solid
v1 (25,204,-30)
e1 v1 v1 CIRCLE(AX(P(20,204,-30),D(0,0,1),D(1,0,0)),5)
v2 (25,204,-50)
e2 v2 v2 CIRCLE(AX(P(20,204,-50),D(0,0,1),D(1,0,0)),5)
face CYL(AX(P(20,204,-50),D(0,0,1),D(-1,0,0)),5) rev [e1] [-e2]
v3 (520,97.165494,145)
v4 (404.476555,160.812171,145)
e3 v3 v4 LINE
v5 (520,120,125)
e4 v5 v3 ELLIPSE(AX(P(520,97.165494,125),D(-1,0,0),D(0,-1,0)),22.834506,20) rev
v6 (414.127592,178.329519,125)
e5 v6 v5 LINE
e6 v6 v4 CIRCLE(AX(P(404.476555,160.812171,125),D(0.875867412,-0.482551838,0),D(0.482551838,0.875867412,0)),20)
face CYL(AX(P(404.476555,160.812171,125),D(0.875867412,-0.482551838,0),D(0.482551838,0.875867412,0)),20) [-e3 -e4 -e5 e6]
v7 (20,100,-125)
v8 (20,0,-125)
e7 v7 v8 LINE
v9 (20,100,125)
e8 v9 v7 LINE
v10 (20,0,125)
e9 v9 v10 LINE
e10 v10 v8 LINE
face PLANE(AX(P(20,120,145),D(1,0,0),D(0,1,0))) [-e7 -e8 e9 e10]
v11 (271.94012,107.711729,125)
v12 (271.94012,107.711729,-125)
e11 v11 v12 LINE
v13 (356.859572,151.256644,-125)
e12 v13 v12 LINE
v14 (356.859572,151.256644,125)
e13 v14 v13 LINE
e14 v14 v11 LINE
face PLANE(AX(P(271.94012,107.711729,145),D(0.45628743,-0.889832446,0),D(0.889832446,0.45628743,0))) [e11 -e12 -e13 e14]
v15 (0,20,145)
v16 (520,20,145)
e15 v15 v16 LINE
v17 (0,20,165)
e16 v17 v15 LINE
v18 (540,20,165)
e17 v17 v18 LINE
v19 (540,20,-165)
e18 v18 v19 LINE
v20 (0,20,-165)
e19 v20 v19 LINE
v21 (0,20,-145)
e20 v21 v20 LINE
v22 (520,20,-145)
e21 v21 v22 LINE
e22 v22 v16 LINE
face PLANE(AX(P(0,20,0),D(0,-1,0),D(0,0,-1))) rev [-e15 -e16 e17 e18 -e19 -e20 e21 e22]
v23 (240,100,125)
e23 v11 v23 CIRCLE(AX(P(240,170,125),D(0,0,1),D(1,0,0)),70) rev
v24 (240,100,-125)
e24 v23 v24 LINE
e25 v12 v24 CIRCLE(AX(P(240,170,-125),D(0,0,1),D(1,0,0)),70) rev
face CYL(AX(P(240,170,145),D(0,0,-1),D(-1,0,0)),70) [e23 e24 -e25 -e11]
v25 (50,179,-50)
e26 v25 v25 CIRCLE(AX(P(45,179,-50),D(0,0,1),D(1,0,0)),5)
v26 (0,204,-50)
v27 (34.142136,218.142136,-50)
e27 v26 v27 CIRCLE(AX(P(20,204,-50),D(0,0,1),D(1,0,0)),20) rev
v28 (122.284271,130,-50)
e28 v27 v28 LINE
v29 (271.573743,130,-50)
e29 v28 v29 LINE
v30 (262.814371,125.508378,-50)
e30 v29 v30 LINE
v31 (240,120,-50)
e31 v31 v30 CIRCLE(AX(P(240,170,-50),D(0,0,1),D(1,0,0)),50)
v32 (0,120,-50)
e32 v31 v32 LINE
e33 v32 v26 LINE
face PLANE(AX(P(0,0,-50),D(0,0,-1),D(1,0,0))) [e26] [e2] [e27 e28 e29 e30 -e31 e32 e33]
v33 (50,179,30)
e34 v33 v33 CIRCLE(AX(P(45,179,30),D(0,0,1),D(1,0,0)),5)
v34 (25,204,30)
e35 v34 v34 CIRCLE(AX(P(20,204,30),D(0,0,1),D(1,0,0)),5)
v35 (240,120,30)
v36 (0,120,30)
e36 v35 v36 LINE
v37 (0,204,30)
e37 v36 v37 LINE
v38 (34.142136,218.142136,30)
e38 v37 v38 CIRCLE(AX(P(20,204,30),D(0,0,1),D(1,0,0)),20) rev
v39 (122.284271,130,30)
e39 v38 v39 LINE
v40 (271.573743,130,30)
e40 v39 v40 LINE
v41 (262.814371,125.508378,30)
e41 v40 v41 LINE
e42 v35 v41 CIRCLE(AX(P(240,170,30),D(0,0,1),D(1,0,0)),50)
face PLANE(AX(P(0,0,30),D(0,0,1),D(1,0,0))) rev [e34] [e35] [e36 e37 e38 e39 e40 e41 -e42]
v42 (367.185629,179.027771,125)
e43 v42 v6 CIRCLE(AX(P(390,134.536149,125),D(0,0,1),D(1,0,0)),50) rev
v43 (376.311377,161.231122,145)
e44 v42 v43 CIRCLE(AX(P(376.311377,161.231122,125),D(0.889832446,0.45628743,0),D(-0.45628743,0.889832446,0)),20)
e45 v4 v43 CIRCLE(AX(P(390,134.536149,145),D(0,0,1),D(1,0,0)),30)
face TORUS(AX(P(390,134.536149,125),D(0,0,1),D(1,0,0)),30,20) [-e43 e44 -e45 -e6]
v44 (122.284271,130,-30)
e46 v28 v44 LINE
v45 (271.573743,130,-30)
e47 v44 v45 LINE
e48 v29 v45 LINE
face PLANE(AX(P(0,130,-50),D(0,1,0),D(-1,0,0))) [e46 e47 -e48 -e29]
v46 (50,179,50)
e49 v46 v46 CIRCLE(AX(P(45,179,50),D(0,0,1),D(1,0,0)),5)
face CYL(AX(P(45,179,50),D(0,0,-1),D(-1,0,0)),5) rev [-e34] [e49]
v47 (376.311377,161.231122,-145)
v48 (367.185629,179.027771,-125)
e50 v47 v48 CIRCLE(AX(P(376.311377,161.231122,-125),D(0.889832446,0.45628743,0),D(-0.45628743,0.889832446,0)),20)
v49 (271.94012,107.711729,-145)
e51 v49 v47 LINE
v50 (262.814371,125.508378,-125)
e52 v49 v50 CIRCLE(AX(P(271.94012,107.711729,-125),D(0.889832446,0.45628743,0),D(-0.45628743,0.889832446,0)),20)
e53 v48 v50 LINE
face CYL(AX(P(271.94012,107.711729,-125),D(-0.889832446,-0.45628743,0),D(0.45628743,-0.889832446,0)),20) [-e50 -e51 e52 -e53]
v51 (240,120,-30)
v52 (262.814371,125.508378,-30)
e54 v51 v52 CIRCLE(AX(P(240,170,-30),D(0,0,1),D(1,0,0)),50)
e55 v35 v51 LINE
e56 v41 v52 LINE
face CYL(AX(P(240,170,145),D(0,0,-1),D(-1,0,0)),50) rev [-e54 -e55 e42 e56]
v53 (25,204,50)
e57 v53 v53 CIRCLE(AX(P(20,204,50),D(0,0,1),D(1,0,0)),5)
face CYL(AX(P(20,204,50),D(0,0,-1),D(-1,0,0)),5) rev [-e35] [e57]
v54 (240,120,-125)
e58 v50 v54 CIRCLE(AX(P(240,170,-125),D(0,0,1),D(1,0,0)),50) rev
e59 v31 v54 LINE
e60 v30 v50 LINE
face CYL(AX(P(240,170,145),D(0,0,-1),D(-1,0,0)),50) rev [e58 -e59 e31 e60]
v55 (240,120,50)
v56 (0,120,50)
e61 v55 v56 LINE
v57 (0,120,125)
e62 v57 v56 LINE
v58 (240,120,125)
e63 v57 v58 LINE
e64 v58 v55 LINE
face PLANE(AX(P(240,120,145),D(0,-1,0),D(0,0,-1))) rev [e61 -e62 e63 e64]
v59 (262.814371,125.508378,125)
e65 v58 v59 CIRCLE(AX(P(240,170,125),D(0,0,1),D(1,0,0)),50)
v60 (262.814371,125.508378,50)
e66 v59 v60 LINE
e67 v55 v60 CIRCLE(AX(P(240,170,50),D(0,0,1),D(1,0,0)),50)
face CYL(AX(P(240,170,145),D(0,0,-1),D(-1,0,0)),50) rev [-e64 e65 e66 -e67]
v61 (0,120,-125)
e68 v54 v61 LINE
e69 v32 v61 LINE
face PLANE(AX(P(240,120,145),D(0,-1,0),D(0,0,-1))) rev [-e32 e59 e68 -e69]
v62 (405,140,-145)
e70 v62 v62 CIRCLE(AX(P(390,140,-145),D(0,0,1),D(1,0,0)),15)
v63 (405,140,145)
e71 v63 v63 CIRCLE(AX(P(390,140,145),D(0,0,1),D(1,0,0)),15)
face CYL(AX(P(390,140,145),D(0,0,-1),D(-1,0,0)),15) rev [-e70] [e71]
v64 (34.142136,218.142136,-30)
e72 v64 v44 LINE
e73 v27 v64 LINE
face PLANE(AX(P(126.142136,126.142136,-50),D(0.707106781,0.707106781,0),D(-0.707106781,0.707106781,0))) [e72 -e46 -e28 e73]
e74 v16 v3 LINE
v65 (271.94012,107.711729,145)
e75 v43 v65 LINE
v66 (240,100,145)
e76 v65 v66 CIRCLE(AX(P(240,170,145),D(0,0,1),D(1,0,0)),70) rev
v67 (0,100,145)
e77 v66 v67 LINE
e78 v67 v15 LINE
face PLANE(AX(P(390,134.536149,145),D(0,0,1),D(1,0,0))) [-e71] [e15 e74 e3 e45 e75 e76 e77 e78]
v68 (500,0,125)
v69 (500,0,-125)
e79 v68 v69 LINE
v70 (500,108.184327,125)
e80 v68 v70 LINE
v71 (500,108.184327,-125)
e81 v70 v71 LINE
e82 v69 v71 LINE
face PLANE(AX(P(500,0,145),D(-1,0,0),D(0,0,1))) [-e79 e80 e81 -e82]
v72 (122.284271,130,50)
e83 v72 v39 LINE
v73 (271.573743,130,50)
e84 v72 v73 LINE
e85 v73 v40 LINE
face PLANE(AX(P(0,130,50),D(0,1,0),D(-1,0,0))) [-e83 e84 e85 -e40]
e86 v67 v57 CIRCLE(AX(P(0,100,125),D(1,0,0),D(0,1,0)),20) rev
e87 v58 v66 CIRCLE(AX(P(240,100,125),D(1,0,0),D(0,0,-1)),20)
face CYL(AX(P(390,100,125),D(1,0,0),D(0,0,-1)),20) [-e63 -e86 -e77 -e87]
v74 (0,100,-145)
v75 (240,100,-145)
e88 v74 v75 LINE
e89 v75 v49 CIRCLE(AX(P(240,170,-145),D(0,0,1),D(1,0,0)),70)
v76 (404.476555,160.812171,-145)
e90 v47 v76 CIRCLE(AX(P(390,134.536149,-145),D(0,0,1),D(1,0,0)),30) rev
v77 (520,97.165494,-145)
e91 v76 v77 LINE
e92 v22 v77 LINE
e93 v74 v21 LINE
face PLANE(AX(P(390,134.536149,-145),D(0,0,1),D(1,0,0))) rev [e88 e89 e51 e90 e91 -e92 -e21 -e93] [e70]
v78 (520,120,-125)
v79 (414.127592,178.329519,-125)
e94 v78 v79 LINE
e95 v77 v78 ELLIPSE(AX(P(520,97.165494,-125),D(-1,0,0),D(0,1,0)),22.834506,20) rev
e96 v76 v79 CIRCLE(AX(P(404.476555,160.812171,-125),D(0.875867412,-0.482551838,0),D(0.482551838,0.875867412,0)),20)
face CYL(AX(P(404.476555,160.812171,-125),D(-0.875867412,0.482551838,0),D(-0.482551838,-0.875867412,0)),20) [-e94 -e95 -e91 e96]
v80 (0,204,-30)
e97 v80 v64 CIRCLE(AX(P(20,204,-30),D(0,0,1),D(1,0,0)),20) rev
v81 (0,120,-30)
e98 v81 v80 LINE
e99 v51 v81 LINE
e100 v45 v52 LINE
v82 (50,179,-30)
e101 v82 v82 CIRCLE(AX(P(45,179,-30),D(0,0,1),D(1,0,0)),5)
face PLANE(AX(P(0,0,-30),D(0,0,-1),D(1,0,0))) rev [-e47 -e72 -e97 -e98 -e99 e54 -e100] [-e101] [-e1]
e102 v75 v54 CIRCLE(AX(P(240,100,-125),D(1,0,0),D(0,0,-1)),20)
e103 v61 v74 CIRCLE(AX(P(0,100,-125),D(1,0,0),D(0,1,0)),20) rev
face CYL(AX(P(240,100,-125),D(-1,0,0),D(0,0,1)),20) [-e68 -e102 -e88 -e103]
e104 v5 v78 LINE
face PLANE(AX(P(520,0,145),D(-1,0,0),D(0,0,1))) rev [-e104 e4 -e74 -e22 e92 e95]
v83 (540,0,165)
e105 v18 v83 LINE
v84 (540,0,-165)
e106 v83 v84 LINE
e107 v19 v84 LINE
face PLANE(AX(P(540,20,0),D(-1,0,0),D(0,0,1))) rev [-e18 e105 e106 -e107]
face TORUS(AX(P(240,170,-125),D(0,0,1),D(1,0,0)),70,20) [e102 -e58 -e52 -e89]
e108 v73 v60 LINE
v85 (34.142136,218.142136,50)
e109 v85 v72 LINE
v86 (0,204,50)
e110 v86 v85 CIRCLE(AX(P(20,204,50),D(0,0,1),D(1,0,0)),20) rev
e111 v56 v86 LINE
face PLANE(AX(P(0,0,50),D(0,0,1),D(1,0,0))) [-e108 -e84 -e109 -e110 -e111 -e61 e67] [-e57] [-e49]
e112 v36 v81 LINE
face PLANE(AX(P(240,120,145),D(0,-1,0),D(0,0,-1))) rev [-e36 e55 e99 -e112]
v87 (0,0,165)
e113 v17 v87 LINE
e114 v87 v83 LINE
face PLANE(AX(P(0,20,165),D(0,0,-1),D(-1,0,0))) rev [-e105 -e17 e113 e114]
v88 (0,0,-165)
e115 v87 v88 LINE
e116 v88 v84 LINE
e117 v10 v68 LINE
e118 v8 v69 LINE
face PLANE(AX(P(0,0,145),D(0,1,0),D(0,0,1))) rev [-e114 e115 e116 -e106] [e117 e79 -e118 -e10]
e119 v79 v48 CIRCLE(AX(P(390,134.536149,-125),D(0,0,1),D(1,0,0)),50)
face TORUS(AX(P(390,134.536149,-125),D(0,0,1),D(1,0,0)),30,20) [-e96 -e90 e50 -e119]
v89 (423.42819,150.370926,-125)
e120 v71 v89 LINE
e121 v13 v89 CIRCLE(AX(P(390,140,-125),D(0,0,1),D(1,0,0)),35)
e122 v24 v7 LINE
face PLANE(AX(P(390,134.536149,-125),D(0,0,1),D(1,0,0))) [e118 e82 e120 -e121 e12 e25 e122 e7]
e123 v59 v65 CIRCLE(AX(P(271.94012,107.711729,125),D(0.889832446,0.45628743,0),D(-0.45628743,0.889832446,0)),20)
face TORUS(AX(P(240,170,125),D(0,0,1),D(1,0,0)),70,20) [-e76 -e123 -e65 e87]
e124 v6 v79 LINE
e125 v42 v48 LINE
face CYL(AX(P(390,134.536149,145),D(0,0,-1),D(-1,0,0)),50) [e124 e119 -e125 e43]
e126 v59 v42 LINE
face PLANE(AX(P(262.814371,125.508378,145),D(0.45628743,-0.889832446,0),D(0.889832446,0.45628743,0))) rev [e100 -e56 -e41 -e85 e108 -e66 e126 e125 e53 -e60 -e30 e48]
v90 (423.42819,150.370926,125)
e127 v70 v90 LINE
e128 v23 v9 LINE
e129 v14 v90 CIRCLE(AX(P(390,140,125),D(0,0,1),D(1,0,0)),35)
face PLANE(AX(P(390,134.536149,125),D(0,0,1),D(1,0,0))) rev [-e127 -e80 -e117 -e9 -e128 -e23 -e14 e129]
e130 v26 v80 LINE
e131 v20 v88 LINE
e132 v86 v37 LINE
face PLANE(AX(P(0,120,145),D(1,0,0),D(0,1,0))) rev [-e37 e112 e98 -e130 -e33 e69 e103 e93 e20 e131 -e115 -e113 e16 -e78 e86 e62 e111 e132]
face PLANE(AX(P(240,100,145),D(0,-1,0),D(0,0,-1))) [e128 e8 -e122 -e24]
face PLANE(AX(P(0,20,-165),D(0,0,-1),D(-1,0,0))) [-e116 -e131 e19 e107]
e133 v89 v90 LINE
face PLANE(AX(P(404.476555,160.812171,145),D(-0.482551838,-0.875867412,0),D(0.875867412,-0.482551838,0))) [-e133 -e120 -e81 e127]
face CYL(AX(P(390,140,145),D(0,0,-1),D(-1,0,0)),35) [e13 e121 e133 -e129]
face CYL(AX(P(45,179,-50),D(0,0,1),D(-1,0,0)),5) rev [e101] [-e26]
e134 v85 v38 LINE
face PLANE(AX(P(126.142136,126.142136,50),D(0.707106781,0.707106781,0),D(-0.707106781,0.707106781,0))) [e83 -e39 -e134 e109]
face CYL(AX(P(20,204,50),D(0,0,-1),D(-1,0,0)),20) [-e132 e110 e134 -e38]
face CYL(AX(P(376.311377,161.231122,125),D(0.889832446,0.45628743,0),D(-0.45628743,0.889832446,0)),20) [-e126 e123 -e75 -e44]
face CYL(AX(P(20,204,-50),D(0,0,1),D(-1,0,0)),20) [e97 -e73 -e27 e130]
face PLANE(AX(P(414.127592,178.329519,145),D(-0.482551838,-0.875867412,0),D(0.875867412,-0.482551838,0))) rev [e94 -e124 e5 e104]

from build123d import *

# Parameters (mm, degrees)
SKETCH1_R           = 15
BOSS_EXTRUDE2_DEPTH = 145
BOSS_EXTRUDE3_START = 50
SKETCH5_R           = 5
BOSS_EXTRUDE3_DEPTH = 20
SHELL1_START        = -125
SHELL1_DEPTH        = 250
SKETCH6_W           = 520
SKETCH6_H           = 290
BOSS_EXTRUDE4_DEPTH = 20
FILLET1_R           = 20


# Read off the part's stored shape, not the designer's step: Shell1
with BuildPart() as part:
    # Sketch1 → Boss-Extrude2 (new, symmetric)
    with BuildSketch(Plane.XY):
        with BuildLine():
            Line((0, 120), (0, 0))
            Line((0, 0), (520, 0))
            Line((520, 0), (520, 120))
            Line((520, 120), (414.127591904, 178.329519311))
            ThreePointArc((414.127591904, 178.329519311), (390.743657055, 184.530618142), (367.18562851, 179.027770991))
            Line((367.18562851, 179.027770991), (262.81437149, 125.508377715))
            ThreePointArc((262.81437149, 125.508377715), (251.734966676, 121.396599326), (240, 120))
            Line((240, 120), (0, 120))
        make_face()
        with Locations((390, 140)):
            Circle(SKETCH1_R, mode=Mode.SUBTRACT)
    extrude(amount=BOSS_EXTRUDE2_DEPTH, both=True)

    # Sketch5 → Boss-Extrude3 (add)
    with BuildSketch(Plane.XY.offset(BOSS_EXTRUDE3_START)):
        with BuildLine():
            Line((240, 120), (0, 120))
            Line((0, 120), (0, 204))
            ThreePointArc((0, 204), (12.346331353, 222.47759065), (34.142135624, 218.142135624))
            Line((34.142135624, 218.142135624), (122.284271247, 130))
            Line((122.284271247, 130), (271.573743284, 130))
            Line((271.573743284, 130), (262.81437149, 125.508377715))
            ThreePointArc((262.81437149, 125.508377715), (251.734966676, 121.396599326), (240, 120))
        make_face()
        with Locations((20, 204)):
            Circle(SKETCH5_R, mode=Mode.SUBTRACT)
        with Locations((45, 179)):
            Circle(SKETCH5_R, mode=Mode.SUBTRACT)
    extrude(amount=-BOSS_EXTRUDE3_DEPTH)

    # Mirror1: part across plane


with BuildPart() as part_1:
    add(part.part)
    add(part.part.mirror(Plane.XY))

    # Shell1 outline → Shell1 (cut)
    with BuildSketch(Plane.XY.offset(SHELL1_START)):
        with BuildLine():
            Line((356.85957207, 151.256644109), (271.940120086, 107.711728801))
            ThreePointArc((271.940120086, 107.711728801), (256.428953346, 101.955239056), (240, 100))
            Line((240, 100), (20, 100))
            Line((20, 100), (20, 0))
            Line((20, 0), (500, 0))
            Line((500, 0), (500, 108.184326651))
            Line((500, 108.184326651), (423.428190104, 150.370926015))
            ThreePointArc((423.428190104, 150.370926015), (389.534354317, 105.00309765), (356.85957207, 151.256644109))
        make_face()
    extrude(amount=SHELL1_DEPTH, mode=Mode.SUBTRACT)

    # Sketch6 → Boss-Extrude4 (add)
    # profile 1 of 2: a face of its own
    with BuildSketch(Plane.XZ):
        with Locations((260, 0)):
            Rectangle(SKETCH6_W, SKETCH6_H)
        Polygon((20, 125), (500, 125), (500, -125), (240, -125), (20, -125), align=None, mode=Mode.SUBTRACT)
    # profile 2 of 2: a face of its own
    with BuildSketch(Plane.XZ):
        Polygon((540, 165), (0, 165), (0, 145), (520, 145), (520, -145), (0, -145), (0, -165), (540, -165), align=None)
    extrude(amount=-BOSS_EXTRUDE4_DEPTH)

    # Fillet1
    fillet1_edges = [part_1.edges().sort_by_distance(p)[0] for p in [
        (120, 120, -145),
        (467.063795952, 149.164759656, 145),
        (390.743657055, 184.530618142, 145),
        (315, 152.268074353, 145),
        (251.734966676, 121.396599326, 145),
        (120, 120, 145),
        (251.734966676, 121.396599326, -145),
        (315, 152.268074353, -145),
        (390.743657055, 184.530618142, -145),
        (467.063795952, 149.164759656, -145),
    ]]
    fillet(fillet1_edges, radius=FILLET1_R)


solid = part_1.part
